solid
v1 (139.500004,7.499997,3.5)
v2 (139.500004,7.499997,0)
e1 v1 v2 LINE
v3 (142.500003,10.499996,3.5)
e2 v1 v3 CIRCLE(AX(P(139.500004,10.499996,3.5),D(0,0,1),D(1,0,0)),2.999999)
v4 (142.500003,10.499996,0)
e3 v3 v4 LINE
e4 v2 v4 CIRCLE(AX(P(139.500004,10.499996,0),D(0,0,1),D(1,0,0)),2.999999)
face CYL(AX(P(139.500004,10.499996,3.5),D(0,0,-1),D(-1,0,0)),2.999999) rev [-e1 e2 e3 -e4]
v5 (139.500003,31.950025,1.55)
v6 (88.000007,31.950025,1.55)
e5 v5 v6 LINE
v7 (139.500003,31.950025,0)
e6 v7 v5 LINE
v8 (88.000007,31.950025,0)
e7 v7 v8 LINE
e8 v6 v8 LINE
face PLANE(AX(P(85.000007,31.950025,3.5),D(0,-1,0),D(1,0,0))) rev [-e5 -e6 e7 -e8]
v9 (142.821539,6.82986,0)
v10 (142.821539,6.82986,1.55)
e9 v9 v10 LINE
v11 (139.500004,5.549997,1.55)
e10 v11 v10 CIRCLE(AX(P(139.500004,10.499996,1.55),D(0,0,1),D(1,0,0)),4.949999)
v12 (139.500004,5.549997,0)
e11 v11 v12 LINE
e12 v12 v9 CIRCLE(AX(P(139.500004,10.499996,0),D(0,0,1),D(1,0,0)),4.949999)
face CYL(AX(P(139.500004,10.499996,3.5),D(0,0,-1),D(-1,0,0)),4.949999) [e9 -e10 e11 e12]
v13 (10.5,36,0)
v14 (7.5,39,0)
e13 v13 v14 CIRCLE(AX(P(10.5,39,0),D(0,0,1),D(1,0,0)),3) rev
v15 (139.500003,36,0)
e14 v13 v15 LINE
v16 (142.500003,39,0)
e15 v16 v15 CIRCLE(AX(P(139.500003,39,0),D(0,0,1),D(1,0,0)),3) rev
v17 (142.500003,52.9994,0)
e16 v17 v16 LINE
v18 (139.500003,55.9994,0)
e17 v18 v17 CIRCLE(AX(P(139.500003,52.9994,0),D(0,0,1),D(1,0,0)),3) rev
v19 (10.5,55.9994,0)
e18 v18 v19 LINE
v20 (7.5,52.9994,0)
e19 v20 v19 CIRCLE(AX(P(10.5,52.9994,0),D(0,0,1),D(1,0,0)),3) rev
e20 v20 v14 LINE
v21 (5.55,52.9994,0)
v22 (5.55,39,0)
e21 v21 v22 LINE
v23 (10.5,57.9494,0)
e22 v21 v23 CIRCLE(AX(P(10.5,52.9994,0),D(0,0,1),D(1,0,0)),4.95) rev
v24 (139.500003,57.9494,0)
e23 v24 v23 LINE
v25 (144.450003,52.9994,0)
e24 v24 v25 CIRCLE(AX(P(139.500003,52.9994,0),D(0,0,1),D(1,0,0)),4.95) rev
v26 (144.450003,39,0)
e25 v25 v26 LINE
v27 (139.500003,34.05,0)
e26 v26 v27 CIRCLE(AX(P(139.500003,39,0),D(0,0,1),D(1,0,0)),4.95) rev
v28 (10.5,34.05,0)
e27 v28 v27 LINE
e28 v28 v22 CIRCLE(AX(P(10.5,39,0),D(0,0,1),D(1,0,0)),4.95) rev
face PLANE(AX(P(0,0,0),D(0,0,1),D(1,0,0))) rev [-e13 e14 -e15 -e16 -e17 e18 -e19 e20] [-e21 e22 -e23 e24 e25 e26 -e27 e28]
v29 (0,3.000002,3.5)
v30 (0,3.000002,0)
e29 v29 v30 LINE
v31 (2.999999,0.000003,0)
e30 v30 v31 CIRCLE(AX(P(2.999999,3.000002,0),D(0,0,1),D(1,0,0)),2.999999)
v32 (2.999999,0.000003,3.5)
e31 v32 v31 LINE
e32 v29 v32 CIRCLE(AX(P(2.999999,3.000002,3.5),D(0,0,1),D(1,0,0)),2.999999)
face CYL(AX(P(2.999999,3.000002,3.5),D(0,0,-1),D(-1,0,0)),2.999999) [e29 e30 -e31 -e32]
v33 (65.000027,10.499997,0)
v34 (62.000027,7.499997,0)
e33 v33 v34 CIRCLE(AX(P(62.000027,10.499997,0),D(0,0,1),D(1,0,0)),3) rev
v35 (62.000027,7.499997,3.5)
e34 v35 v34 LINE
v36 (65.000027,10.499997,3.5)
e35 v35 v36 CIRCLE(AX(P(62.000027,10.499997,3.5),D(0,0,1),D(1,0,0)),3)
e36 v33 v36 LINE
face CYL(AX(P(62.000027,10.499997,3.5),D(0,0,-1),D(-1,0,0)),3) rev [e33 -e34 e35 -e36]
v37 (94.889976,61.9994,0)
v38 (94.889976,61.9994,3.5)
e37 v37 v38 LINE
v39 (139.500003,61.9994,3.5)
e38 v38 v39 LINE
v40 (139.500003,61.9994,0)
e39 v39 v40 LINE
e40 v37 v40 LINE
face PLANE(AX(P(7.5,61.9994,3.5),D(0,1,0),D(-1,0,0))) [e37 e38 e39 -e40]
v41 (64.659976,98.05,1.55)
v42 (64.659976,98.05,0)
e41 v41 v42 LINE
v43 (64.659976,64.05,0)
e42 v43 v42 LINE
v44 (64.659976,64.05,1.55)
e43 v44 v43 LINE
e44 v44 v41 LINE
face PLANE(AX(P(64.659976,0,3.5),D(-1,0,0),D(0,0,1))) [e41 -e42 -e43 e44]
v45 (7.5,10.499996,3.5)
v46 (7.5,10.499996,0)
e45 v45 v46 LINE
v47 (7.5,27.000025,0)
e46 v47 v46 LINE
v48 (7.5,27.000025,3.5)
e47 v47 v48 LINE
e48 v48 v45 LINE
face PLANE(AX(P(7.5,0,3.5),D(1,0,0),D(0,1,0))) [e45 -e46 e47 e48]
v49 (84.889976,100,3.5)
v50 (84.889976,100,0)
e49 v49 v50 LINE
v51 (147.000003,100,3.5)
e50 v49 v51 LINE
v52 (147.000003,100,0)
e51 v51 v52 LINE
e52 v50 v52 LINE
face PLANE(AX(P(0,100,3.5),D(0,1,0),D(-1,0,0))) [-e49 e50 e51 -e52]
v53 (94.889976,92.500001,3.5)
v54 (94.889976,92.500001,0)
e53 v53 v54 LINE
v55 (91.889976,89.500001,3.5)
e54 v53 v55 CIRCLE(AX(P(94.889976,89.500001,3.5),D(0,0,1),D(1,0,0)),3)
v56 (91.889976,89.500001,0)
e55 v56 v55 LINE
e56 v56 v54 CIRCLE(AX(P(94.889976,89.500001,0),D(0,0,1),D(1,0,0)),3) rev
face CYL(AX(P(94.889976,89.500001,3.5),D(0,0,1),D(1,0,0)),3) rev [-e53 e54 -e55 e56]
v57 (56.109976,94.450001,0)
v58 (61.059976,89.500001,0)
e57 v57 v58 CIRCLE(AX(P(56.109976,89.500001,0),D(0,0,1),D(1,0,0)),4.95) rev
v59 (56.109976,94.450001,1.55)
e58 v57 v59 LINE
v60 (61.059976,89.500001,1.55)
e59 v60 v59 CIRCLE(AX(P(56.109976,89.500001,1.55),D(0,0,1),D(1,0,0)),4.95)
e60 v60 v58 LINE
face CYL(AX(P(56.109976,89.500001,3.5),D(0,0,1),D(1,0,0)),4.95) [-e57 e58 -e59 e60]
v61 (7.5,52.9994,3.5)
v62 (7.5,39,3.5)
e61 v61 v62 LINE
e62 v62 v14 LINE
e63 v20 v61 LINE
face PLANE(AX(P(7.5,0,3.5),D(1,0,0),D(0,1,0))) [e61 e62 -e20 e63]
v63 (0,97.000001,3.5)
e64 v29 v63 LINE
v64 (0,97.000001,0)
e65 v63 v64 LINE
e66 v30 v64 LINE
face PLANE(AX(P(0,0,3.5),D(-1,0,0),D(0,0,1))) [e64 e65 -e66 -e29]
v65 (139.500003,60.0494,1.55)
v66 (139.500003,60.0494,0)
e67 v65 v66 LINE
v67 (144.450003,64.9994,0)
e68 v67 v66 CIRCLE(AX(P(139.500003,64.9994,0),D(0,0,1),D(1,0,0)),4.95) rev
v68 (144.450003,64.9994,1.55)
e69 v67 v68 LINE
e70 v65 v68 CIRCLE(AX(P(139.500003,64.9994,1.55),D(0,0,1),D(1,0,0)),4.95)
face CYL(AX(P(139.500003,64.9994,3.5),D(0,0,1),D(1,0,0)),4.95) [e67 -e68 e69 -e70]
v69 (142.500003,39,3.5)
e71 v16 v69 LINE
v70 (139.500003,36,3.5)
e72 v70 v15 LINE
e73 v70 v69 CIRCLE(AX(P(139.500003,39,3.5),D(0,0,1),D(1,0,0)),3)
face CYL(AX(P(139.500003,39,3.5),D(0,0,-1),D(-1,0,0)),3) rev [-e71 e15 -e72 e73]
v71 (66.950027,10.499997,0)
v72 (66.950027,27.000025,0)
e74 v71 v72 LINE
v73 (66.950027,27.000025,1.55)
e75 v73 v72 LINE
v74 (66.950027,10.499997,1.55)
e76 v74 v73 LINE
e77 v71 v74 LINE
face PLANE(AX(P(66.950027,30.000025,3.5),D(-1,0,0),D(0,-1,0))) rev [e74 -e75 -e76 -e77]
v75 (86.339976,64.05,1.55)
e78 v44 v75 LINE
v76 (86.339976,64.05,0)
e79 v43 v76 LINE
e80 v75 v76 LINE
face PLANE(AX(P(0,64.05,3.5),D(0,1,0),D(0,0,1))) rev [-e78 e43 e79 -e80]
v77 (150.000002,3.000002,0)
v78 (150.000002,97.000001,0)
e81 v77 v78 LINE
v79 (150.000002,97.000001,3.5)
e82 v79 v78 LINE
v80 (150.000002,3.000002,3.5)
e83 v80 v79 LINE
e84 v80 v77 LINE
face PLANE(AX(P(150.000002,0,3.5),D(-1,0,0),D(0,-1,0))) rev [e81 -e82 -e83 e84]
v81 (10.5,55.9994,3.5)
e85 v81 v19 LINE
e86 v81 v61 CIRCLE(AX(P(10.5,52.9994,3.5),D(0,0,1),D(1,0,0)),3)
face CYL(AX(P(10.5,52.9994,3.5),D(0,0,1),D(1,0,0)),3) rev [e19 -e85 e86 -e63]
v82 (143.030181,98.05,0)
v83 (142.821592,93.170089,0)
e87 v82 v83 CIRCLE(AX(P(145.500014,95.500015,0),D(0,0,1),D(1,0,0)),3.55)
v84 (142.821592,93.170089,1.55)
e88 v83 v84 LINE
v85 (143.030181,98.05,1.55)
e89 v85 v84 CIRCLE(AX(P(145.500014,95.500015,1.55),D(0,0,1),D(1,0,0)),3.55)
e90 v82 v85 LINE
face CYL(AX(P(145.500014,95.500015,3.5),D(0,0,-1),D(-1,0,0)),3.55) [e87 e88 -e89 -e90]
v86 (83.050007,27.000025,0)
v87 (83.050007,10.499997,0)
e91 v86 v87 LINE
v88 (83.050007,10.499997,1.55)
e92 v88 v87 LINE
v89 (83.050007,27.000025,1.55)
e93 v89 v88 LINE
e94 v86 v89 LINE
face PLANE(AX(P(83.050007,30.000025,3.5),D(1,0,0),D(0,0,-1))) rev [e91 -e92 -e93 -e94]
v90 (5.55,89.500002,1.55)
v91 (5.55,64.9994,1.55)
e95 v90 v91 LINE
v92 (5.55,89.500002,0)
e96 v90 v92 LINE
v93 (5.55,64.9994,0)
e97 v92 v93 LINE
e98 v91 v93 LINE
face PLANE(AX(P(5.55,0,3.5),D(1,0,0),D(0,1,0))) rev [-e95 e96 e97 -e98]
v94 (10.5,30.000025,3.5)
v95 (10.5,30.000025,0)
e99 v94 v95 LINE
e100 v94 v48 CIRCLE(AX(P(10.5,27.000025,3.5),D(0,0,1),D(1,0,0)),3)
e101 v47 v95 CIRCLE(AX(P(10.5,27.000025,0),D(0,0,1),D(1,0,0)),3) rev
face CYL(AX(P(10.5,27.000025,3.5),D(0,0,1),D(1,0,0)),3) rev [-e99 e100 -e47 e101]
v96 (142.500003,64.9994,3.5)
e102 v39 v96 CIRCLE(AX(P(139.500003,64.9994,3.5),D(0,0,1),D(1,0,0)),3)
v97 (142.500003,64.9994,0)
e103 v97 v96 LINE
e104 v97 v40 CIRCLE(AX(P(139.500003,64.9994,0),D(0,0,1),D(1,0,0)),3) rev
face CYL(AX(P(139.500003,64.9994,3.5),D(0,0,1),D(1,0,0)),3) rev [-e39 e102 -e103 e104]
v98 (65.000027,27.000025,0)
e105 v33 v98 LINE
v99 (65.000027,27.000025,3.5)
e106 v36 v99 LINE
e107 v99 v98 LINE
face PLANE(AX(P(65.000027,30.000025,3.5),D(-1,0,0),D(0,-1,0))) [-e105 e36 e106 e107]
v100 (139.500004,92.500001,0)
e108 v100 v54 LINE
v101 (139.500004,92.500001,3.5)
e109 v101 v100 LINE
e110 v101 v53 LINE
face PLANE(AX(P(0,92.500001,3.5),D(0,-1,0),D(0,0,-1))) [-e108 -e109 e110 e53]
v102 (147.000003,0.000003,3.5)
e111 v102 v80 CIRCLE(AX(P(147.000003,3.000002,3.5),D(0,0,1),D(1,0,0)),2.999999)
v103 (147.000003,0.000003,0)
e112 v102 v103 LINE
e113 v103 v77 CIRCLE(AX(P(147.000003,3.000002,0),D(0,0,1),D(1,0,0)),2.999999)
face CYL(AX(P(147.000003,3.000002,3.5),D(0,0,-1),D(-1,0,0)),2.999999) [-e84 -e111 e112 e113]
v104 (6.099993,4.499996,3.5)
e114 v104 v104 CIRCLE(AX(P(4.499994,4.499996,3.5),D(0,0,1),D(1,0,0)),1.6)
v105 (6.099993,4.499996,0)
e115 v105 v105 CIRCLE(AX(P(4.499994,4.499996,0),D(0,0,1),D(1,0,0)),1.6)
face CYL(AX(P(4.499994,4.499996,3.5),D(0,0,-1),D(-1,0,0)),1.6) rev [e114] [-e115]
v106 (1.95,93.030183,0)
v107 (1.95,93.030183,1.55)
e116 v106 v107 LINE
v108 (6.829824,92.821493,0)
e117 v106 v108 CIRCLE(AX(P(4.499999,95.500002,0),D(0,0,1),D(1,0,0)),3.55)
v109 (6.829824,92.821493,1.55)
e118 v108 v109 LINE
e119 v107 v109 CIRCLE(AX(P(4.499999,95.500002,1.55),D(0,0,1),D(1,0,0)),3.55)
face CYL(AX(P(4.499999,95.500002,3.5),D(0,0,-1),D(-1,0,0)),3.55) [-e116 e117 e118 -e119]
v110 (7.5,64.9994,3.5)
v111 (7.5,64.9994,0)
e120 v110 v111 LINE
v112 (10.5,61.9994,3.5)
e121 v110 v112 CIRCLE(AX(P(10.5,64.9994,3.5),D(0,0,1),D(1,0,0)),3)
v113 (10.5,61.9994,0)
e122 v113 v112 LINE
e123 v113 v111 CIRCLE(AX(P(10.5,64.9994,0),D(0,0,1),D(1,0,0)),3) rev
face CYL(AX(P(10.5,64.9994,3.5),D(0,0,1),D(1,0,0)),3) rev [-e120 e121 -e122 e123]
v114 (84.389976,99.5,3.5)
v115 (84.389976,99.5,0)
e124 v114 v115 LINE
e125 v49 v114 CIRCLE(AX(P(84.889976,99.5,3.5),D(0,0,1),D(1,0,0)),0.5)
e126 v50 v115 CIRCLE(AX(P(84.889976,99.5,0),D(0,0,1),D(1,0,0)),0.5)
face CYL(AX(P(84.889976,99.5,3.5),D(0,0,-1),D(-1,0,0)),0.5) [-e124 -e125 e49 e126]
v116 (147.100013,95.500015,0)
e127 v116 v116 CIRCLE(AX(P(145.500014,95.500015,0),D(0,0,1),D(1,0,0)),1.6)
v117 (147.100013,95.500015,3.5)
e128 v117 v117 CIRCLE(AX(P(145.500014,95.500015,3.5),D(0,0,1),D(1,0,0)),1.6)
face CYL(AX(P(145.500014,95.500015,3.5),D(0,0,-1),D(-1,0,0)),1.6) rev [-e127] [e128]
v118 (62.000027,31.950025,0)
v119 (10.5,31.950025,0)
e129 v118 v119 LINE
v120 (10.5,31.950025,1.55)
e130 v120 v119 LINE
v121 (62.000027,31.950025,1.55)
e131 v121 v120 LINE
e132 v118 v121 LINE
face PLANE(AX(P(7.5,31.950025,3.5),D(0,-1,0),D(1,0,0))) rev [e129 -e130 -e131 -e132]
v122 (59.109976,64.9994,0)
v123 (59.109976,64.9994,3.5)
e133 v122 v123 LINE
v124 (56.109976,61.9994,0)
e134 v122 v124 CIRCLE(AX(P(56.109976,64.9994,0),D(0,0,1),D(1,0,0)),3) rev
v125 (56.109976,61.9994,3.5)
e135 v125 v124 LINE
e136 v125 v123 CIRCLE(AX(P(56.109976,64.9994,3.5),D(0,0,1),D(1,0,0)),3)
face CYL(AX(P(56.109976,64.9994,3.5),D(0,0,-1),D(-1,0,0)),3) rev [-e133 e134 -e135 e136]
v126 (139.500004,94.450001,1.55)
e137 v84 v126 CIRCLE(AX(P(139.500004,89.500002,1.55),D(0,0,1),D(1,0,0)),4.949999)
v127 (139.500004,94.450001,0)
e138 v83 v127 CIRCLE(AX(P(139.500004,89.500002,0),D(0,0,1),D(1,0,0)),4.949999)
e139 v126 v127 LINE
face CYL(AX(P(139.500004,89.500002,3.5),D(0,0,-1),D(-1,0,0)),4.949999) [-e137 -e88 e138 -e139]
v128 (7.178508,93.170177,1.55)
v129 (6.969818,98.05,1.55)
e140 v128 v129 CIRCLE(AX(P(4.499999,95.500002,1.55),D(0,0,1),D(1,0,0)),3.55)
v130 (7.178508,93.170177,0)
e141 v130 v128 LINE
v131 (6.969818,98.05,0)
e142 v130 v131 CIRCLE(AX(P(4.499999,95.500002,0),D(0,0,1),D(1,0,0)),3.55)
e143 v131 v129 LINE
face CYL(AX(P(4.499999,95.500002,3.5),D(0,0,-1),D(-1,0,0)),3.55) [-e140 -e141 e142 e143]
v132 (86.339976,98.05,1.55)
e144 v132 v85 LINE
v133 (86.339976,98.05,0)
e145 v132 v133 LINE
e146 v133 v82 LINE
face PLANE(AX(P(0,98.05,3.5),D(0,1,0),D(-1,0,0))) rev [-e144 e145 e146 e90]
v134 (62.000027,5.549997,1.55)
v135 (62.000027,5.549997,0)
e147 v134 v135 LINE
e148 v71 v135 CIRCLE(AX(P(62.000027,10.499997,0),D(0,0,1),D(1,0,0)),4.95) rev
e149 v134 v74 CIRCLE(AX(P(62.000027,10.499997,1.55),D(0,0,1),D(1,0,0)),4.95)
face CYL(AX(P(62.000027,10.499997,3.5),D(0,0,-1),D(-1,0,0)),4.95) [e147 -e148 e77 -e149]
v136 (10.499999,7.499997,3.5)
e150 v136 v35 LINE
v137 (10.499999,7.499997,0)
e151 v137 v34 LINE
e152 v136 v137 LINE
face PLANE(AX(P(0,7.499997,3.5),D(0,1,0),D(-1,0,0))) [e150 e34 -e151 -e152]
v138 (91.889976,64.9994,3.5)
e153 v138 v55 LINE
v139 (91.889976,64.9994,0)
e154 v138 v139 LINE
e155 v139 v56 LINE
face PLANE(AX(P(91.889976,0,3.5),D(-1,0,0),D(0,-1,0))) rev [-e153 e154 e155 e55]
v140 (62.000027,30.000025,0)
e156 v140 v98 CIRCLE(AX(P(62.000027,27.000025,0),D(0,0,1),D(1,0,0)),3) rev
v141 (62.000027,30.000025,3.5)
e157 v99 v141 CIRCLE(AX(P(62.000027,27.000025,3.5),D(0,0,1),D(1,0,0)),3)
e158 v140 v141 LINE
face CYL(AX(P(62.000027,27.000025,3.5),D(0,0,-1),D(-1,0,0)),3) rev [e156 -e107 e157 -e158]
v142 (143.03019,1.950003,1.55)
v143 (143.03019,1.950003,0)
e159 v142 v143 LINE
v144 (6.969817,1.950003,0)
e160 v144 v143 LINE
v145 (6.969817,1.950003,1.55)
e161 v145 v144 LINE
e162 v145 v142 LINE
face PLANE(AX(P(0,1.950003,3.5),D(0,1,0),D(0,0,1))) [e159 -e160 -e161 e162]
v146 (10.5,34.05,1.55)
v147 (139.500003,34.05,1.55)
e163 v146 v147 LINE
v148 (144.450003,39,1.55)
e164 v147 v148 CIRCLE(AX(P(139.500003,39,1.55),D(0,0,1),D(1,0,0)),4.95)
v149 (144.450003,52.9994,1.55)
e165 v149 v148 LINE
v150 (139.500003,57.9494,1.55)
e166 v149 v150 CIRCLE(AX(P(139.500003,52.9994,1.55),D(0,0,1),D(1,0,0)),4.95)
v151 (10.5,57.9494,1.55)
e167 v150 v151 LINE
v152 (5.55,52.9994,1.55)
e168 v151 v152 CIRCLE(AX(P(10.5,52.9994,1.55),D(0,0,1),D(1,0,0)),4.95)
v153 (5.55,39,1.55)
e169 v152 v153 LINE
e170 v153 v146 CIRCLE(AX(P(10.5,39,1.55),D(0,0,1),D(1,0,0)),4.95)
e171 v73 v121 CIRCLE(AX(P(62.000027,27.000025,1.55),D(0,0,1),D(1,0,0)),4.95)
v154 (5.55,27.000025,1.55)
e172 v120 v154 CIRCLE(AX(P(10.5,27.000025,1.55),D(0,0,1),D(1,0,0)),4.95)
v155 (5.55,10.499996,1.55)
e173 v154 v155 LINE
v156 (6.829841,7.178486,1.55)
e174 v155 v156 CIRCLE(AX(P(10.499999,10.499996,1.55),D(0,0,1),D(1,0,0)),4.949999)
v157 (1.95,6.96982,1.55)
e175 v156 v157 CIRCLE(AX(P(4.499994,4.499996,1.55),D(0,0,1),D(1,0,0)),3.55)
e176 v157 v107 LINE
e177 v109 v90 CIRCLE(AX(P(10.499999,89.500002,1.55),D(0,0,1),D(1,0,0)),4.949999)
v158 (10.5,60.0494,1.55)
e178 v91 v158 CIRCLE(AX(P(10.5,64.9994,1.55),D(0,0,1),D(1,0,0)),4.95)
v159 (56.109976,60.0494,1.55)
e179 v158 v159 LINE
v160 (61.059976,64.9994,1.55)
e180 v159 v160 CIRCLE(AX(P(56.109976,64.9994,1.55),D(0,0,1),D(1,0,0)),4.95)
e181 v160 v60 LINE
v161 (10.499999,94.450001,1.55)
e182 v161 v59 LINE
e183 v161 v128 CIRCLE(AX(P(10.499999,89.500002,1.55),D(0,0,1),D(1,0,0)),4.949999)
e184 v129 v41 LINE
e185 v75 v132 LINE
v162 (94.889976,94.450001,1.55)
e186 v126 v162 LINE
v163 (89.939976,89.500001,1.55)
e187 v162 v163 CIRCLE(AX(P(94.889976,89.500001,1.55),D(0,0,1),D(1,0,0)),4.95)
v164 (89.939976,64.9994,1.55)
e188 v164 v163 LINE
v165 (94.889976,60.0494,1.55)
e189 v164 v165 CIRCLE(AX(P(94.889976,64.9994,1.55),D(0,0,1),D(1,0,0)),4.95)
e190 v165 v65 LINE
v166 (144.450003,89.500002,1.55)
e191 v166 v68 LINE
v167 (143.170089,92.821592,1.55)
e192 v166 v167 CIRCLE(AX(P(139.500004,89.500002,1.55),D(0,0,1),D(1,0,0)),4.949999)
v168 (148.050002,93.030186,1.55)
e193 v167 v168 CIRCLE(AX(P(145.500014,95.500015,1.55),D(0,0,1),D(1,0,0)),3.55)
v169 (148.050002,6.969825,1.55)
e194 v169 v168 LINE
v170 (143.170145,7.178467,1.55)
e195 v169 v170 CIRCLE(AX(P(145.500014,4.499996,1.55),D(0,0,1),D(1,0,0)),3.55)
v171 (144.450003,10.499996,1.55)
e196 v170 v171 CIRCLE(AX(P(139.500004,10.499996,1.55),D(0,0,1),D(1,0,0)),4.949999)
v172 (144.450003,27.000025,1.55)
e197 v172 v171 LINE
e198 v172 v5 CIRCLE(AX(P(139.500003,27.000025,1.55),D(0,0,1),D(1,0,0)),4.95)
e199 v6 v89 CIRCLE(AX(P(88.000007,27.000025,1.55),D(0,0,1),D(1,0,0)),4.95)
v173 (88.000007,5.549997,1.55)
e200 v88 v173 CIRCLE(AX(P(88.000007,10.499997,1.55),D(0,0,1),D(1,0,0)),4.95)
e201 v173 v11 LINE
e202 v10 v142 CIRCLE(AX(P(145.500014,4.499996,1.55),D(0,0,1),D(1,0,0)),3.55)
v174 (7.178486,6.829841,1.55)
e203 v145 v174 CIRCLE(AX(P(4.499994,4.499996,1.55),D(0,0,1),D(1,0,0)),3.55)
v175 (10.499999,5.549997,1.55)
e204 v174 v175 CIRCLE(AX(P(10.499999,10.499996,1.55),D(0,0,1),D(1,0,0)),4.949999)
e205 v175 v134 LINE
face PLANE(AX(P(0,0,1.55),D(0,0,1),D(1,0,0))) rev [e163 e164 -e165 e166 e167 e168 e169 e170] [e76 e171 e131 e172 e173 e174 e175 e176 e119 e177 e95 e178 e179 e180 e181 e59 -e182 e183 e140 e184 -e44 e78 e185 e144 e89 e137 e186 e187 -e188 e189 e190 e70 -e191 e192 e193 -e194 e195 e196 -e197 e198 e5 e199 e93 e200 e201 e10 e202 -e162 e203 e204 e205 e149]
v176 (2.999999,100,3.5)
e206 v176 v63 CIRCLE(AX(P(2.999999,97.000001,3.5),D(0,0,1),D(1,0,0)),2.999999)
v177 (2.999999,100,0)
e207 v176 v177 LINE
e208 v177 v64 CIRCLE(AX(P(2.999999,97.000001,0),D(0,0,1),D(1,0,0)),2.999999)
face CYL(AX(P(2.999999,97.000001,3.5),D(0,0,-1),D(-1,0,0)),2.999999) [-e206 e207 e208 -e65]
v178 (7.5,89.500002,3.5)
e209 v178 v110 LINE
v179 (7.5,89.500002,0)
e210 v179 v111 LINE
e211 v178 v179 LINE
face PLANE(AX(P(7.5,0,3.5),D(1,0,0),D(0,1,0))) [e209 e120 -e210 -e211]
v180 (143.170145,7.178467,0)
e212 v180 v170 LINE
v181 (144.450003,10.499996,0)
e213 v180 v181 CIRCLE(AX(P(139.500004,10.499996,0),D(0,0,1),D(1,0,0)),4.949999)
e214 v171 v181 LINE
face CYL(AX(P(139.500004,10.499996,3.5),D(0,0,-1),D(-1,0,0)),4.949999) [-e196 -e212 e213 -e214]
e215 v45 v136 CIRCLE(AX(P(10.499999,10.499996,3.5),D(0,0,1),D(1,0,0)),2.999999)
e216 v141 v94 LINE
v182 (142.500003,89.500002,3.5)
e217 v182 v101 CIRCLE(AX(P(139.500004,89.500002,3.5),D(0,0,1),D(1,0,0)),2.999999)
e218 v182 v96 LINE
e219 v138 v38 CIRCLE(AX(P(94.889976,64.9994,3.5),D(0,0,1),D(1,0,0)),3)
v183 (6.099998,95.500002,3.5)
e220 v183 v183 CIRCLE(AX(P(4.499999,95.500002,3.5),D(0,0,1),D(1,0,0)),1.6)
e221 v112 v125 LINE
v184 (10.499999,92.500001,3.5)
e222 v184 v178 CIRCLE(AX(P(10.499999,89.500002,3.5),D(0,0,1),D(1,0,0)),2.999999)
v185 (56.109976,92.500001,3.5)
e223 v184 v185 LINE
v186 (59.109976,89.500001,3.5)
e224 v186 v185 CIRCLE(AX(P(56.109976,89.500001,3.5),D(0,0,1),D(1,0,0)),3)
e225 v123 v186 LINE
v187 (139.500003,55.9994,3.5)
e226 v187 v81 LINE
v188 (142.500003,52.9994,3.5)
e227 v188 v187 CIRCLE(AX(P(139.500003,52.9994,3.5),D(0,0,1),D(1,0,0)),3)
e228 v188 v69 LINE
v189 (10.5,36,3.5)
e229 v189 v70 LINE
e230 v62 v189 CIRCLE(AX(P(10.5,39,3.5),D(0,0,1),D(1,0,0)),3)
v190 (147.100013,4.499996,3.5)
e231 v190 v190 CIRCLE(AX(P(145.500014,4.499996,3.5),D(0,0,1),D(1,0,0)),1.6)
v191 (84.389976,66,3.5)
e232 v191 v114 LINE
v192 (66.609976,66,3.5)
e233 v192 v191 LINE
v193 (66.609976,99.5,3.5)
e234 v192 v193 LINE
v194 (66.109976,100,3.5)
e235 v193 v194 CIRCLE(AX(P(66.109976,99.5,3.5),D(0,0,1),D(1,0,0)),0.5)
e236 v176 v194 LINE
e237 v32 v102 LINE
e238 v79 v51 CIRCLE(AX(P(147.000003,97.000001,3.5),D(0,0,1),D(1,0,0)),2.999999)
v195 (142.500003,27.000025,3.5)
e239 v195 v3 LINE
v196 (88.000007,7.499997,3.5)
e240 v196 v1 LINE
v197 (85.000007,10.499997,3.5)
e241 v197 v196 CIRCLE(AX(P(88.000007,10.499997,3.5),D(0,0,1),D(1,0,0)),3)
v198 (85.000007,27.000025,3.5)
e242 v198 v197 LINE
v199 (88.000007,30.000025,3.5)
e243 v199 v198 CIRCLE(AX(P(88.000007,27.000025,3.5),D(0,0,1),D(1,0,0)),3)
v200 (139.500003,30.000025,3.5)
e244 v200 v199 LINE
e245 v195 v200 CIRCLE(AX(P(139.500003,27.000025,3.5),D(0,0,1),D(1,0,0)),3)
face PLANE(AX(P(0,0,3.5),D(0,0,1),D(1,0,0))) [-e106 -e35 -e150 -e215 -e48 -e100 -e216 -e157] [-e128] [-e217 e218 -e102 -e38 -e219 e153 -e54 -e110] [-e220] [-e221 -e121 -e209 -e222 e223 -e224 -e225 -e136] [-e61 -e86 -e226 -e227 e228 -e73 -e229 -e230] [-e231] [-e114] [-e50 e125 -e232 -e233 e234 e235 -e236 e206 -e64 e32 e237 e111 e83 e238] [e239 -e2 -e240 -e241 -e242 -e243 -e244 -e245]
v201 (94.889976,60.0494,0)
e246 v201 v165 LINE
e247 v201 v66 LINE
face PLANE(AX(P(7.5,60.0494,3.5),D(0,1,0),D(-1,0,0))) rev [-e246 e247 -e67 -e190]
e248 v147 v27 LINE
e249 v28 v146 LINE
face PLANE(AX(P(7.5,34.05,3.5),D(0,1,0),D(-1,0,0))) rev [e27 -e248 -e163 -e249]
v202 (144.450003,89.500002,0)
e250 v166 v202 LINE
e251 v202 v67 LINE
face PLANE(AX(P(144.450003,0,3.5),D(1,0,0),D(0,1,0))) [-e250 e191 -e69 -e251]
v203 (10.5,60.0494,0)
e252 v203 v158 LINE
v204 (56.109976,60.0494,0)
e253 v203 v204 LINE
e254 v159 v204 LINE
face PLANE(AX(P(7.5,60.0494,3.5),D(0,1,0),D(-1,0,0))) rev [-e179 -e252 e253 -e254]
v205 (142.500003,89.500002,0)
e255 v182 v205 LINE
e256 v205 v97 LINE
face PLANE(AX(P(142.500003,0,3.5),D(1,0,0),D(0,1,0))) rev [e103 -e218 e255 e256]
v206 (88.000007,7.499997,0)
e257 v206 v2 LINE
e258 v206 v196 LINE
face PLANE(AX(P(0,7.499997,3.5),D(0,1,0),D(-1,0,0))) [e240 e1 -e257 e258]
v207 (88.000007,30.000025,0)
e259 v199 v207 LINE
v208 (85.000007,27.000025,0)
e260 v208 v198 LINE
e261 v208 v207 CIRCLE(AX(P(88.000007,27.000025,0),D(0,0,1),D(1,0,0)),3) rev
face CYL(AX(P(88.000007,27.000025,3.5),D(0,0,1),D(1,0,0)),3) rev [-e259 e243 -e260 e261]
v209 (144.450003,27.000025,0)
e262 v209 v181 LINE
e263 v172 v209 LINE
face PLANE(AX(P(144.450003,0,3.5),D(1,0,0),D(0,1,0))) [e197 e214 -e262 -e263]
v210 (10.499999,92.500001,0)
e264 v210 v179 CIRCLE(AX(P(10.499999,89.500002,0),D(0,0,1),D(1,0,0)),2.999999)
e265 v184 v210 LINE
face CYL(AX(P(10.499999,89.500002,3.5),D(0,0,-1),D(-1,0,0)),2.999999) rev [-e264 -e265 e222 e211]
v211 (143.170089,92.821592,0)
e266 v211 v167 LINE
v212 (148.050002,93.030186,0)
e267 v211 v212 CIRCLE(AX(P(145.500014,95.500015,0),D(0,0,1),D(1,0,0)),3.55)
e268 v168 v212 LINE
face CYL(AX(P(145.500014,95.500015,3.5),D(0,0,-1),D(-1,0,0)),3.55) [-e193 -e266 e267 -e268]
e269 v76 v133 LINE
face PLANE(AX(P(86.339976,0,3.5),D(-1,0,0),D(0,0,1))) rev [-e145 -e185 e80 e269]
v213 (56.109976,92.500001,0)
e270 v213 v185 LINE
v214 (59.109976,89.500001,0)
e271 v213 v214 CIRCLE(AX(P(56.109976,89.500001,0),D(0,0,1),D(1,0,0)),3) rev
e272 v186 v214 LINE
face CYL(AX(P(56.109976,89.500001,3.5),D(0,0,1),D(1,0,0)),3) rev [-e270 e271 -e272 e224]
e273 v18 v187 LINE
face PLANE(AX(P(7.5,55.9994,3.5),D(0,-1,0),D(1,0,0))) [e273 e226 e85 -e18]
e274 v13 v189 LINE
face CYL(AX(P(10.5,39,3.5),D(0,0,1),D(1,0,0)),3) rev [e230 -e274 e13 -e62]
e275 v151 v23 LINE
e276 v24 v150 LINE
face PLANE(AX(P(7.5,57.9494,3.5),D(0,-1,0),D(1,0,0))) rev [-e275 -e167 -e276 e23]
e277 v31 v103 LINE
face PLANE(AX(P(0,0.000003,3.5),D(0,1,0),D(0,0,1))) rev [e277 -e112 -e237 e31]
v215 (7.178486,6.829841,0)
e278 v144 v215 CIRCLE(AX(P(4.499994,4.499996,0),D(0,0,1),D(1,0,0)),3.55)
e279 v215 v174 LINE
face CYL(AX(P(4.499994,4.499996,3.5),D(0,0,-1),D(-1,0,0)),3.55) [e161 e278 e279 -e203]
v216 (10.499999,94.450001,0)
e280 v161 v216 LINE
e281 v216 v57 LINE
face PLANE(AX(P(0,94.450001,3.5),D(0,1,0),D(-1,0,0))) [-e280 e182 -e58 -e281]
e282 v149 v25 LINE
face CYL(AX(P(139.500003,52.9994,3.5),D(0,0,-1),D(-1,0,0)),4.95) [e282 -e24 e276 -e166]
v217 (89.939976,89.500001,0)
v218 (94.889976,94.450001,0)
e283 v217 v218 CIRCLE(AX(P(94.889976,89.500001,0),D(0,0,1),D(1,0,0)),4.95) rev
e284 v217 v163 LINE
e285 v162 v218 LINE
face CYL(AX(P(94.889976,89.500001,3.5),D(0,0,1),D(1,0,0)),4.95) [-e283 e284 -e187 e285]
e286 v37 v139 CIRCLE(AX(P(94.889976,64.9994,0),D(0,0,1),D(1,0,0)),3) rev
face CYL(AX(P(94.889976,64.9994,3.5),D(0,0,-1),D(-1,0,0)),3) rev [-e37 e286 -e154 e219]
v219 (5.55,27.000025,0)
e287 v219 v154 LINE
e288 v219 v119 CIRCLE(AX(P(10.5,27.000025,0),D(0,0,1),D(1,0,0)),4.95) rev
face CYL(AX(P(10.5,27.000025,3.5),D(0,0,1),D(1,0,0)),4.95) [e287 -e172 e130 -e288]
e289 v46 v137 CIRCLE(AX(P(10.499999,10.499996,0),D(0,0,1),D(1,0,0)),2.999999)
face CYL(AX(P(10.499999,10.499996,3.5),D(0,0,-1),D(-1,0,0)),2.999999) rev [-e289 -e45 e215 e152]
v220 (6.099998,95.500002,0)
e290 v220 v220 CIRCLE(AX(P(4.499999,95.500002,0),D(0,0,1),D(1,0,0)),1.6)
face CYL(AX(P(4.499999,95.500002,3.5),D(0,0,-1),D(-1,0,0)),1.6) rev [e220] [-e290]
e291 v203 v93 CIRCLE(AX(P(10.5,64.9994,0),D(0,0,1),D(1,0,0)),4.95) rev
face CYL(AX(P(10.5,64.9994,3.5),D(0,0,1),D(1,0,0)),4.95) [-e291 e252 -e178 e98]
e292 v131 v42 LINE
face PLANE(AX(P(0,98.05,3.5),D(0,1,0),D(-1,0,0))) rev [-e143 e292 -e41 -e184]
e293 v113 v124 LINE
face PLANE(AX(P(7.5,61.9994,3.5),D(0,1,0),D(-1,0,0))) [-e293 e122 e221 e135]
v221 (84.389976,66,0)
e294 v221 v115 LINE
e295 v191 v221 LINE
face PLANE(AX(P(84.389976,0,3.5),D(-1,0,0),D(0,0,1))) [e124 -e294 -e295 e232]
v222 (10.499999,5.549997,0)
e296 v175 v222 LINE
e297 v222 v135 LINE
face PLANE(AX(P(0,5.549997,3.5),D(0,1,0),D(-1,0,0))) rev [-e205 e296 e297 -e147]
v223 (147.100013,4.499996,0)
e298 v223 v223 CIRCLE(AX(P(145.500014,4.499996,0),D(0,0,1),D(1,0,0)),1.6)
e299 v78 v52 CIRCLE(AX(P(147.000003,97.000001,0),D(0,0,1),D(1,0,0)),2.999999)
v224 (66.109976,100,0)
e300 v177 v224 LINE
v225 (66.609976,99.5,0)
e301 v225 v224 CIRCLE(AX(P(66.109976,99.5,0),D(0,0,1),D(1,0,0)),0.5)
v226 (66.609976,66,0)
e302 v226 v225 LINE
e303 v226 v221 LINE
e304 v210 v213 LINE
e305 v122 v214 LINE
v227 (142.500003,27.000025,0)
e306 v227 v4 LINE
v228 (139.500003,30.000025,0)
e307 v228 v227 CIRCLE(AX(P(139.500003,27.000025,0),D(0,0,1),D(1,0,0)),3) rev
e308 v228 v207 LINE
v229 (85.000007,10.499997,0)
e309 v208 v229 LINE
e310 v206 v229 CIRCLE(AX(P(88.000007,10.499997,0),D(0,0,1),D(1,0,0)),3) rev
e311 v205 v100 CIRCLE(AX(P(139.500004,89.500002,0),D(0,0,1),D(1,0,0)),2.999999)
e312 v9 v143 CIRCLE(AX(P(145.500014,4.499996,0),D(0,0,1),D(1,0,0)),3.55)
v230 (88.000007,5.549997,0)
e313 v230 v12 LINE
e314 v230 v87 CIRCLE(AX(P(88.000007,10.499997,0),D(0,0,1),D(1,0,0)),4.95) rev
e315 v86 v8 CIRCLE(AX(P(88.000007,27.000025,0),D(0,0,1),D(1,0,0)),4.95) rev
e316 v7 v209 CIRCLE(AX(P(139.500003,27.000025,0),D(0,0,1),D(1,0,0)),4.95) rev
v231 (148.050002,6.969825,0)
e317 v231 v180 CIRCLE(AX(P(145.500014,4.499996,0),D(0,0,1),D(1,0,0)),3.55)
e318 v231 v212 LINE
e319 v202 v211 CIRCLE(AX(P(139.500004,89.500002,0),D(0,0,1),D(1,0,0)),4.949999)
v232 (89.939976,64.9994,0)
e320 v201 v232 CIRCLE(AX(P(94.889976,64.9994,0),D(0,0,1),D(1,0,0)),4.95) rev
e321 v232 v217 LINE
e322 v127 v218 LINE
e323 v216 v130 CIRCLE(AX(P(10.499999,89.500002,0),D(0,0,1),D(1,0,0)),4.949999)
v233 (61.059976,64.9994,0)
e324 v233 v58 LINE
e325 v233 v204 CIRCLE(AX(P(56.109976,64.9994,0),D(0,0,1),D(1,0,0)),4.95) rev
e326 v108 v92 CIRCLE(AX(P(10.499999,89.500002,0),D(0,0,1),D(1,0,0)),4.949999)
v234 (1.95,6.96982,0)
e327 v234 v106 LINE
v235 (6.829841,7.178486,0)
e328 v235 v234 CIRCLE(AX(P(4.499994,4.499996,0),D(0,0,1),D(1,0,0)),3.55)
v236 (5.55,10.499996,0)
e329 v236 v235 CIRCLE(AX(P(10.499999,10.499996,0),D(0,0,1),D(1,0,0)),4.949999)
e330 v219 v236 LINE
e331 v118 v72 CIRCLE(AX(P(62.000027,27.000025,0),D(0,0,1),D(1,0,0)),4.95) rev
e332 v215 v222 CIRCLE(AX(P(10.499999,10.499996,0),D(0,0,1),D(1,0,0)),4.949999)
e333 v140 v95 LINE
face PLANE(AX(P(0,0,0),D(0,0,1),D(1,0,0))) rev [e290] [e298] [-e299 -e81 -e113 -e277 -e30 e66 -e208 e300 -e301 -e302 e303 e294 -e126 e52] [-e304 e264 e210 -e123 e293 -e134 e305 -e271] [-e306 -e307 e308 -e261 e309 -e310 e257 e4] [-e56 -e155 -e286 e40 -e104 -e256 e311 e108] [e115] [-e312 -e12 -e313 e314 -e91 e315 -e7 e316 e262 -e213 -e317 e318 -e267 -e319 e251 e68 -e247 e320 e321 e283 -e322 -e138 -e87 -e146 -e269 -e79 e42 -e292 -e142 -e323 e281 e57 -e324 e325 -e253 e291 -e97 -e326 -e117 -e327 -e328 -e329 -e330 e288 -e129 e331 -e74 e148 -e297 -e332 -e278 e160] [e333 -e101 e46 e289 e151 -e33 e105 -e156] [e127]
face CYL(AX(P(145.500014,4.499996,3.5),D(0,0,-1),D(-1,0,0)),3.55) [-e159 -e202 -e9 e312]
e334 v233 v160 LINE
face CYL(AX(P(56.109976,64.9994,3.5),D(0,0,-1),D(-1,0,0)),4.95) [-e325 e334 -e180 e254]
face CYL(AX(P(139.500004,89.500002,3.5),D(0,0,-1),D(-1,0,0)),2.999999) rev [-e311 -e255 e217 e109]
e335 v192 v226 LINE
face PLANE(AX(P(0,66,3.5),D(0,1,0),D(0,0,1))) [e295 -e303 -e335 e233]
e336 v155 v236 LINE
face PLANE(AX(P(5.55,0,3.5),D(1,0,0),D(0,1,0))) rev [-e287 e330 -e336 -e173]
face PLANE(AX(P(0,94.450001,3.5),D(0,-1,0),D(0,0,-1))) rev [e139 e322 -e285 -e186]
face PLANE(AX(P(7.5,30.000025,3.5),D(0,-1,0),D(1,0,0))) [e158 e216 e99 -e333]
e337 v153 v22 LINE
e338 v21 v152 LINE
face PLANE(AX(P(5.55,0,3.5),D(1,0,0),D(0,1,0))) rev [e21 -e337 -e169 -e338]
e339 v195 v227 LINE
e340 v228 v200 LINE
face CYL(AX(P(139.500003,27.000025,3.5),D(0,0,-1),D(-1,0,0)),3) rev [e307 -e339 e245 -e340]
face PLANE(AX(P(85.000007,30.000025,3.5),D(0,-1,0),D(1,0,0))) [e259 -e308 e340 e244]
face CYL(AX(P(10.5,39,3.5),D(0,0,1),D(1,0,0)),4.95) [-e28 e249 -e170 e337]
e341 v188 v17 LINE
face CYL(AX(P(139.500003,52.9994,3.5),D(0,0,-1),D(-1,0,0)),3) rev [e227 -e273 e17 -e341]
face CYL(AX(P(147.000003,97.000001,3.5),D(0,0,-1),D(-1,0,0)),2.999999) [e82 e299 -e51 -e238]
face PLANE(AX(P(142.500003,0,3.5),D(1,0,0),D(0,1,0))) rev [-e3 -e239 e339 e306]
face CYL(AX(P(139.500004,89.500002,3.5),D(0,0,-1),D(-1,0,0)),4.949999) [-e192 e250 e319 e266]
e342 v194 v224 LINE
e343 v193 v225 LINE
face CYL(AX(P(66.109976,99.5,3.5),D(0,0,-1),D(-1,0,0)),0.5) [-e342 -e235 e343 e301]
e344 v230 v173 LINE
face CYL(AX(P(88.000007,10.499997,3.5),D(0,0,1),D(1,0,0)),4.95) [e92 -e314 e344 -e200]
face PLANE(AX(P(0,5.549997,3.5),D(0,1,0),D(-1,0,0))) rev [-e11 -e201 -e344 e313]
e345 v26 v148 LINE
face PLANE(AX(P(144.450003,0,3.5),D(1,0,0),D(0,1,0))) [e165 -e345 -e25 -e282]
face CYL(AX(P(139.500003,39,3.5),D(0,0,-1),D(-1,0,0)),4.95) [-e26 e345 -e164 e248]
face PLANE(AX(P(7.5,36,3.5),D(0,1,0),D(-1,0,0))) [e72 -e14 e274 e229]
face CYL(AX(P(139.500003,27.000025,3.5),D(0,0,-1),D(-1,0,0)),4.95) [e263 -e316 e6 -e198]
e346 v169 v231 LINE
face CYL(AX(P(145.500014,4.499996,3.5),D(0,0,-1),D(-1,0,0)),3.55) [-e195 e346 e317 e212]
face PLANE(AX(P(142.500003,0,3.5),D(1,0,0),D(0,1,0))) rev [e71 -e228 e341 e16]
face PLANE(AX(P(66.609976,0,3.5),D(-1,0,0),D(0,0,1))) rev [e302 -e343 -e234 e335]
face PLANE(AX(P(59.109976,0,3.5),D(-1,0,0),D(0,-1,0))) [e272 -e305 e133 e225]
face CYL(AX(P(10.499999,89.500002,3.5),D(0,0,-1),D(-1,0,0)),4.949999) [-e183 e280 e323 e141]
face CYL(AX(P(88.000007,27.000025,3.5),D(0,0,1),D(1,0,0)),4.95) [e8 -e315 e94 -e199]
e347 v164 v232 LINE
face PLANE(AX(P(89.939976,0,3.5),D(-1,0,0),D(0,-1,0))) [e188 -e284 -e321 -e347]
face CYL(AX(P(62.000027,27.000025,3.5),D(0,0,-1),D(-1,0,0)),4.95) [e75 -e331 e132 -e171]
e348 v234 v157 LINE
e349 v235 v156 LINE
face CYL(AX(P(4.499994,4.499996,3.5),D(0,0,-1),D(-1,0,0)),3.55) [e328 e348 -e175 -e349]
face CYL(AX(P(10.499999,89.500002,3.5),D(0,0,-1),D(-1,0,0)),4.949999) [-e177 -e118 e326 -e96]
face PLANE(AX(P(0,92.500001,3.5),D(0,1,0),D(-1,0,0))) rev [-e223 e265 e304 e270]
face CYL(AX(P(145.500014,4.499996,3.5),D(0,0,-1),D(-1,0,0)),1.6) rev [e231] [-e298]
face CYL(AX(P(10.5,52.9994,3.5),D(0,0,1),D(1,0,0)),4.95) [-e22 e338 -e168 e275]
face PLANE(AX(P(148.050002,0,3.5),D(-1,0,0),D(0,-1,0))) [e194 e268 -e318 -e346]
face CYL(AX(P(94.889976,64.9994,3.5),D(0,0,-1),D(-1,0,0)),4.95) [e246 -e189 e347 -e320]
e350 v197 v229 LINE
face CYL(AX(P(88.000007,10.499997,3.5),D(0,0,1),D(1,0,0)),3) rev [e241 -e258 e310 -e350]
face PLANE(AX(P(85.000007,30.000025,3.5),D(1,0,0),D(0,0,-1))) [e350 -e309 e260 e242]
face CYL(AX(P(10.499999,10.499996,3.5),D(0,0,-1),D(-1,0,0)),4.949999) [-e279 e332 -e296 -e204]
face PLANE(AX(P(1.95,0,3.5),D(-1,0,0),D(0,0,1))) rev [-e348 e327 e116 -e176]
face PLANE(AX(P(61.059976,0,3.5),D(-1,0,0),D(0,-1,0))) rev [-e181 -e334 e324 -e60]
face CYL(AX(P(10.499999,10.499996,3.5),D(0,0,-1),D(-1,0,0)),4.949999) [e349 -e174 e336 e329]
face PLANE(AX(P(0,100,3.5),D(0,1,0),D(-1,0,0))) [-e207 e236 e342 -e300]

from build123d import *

# Parameters (mm, degrees)
MODEL_R         = 1.59999954
EXTRUDE_1_DEPTH = 3.5
SKETCH_2_W      = 135.00000272
SKETCH_2_H      = 6
EXTRUDE_2_DEPTH = 3.5
FILLET_2_R      = 3
FILLET_3_R      = 3
FILLET_4_R      = 3
FILLET_5_R      = 3
FILLET_6_R      = 3
FILLET_7_R      = 3
FILLET_8_R      = 3
FILLET_9_R      = 3
FILLET_10_R     = 3
FILLET_11_R     = 3
FILLET_12_DEPTH = 3.5
FILLET_13_R     = 3
FILLET_14_R     = 3
FILLET_15_DEPTH = 3.5
FILLET_16_R     = 3
FILLET_17_R     = 3
SHELL_5_DEPTH   = 1.55


with BuildPart() as part:
    # Model → 凸台-拉伸1 (new body)
    with BuildSketch(Plane.XY):
        with BuildLine():
            Line((84.889976, 100), (147.00000318, 100))
            ThreePointArc((147.00000318, 100), (149.121322873, 99.121320613), (150.00000226, 97.00000092))
            Line((150.00000226, 97.00000092), (150.00000226, 3.00000162))
            ThreePointArc((150.00000226, 3.00000162), (149.121322873, 0.878681927), (147.00000318, 2.54e-06))
            Line((147.00000318, 2.54e-06), (2.99999908, 2.54e-06))
            ThreePointArc((2.99999908, 2.54e-06), (0.878679387, 0.878681927), (0, 3.00000162))
            Line((0, 3.00000162), (0, 97.00000092))
            ThreePointArc((0, 97.00000092), (0.878679387, 99.121320613), (2.99999908, 100))
            Line((2.99999908, 100), (66.109976, 100))
            ThreePointArc((66.109976, 100), (66.463529391, 99.853553391), (66.609976, 99.5))
            Line((66.609976, 99.5), (66.609976, 66))
            Line((66.609976, 66), (84.389976, 66))
            Line((84.389976, 66), (84.389976, 99.5))
            ThreePointArc((84.389976, 99.5), (84.536422609, 99.853553391), (84.889976, 100))
        make_face()
        with Locations((4.49999862, 95.50000204)):
            Circle(MODEL_R, mode=Mode.SUBTRACT)
        with Locations((145.5000138, 95.50001474)):
            Circle(MODEL_R, mode=Mode.SUBTRACT)
        with Locations((145.5000138, 4.49999608)):
            Circle(MODEL_R, mode=Mode.SUBTRACT)
        with Locations((4.49999354, 4.49999608)):
            Circle(MODEL_R, mode=Mode.SUBTRACT)
        with BuildLine():
            Line((59.609976, 58.5), (91.389976, 58.5))
            ThreePointArc((91.389976, 58.5), (91.743529391, 58.646446609), (91.889976, 59))
            Line((91.889976, 59), (91.889976, 92.00000066))
            ThreePointArc((91.889976, 92.00000066), (92.036422609, 92.353554051), (92.389976, 92.50000066))
            Line((92.389976, 92.50000066), (139.50000364, 92.50000066))
            ThreePointArc((139.50000364, 92.50000066), (141.621323333, 91.621321273), (142.50000272, 89.50000158))
            Line((142.50000272, 89.50000158), (142.50000272, 10.49999608))
            ThreePointArc((142.50000272, 10.49999608), (141.621323333, 8.378676387), (139.50000364, 7.499997))
            Line((139.50000364, 7.499997), (10.49999908, 7.499997))
            ThreePointArc((10.49999908, 7.499997), (8.378679387, 8.378676387), (7.5, 10.49999608))
            Line((7.5, 10.49999608), (7.5, 89.50000158))
            ThreePointArc((7.5, 89.50000158), (8.378679387, 91.621321273), (10.49999908, 92.50000066))
            Line((10.49999908, 92.50000066), (58.609976, 92.50000066))
            ThreePointArc((58.609976, 92.50000066), (58.963529391, 92.353554051), (59.109976, 92.00000066))
            Line((59.109976, 92.00000066), (59.109976, 59))
            ThreePointArc((59.109976, 59), (59.256422609, 58.646446609), (59.609976, 58.5))
        make_face(mode=Mode.SUBTRACT)
    extrude(amount=EXTRUDE_1_DEPTH)

    # 草图2 → 凸台-拉伸2 (add)
    with BuildSketch(Plane(origin=(0, 0, 0), x_dir=(-1, 0, 0), z_dir=(0, 0, -1))):
        with Locations((-75.00000136, 58.9994)):
            Rectangle(SKETCH_2_W, SKETCH_2_H)
        Polygon((-7.5, 30.00002482), (-65.0000272, 30.00002482), (-65.0000272, 7.499997), (-71.0000272, 7.499997), (-79.0000068, 7.499997), (-85.0000068, 7.499997), (-85.0000068, 30.00002482), (-142.50000272, 30.00002482), (-142.50000272, 36), (-7.5, 36), align=None)
    extrude(amount=-EXTRUDE_2_DEPTH)

    # 圆角2
    fillet_2_edges = [part.edges().sort_by_distance(p)[0] for p in [
        (142.50000272, 30.00002482, 1.75),
    ]]
    fillet(fillet_2_edges, radius=FILLET_2_R)

    # 圆角3
    fillet_3_edges = [part.edges().sort_by_distance(p)[0] for p in [
        (85.0000068, 30.00002482, 1.75),
    ]]
    fillet(fillet_3_edges, radius=FILLET_3_R)

    # 圆角4
    fillet_4_edges = [part.edges().sort_by_distance(p)[0] for p in [
        (85.0000068, 7.499997, 1.75),
    ]]
    fillet(fillet_4_edges, radius=FILLET_4_R)

    # 圆角5
    fillet_5_edges = [part.edges().sort_by_distance(p)[0] for p in [
        (65.0000272, 30.00002482, 1.75),
    ]]
    fillet(fillet_5_edges, radius=FILLET_5_R)

    # 圆角6
    fillet_6_edges = [part.edges().sort_by_distance(p)[0] for p in [
        (7.5, 30.00002482, 1.75),
    ]]
    fillet(fillet_6_edges, radius=FILLET_6_R)

    # 圆角7
    fillet_7_edges = [part.edges().sort_by_distance(p)[0] for p in [
        (65.0000272, 7.499997, 1.75),
    ]]
    fillet(fillet_7_edges, radius=FILLET_7_R)

    # 圆角8
    fillet_8_edges = [part.edges().sort_by_distance(p)[0] for p in [
        (7.5, 55.9994, 1.75),
    ]]
    fillet(fillet_8_edges, radius=FILLET_8_R)

    # 圆角9
    fillet_9_edges = [part.edges().sort_by_distance(p)[0] for p in [
        (7.5, 36, 1.75),
    ]]
    fillet(fillet_9_edges, radius=FILLET_9_R)

    # 圆角10
    fillet_10_edges = [part.edges().sort_by_distance(p)[0] for p in [
        (142.50000272, 55.9994, 1.75),
    ]]
    fillet(fillet_10_edges, radius=FILLET_10_R)

    # 圆角11
    fillet_11_edges = [part.edges().sort_by_distance(p)[0] for p in [
        (142.50000272, 36, 1.75),
    ]]
    fillet(fillet_11_edges, radius=FILLET_11_R)

    # 圆角12: read off the stored shape, not the designer's step
    # 圆角12 outline → 圆角12 (add)
    with BuildSketch(Plane.XY):
        with BuildLine():
            ThreePointArc((56.109976, 92.50000066), (58.231296344, 91.621321004), (59.109976, 89.50000066))
            Line((59.109976, 89.50000066), (59.109976, 92.00000066))
            ThreePointArc((59.109976, 92.00000066), (58.963529391, 92.353554051), (58.609976, 92.50000066))
            Line((58.609976, 92.50000066), (56.109976, 92.50000066))
        make_face()
    extrude(amount=FILLET_12_DEPTH)

    # 圆角13
    fillet_13_edges = [part.edges().sort_by_distance(p)[0] for p in [
        (7.5, 61.9994, 1.75),
    ]]
    fillet(fillet_13_edges, radius=FILLET_13_R)

    # 圆角14
    fillet_14_edges = [part.edges().sort_by_distance(p)[0] for p in [
        (59.109976, 61.9994, 1.75),
    ]]
    fillet(fillet_14_edges, radius=FILLET_14_R)

    # 圆角15: read off the stored shape, not the designer's step
    # 圆角15 outline → 圆角15 (add)
    with BuildSketch(Plane.XY):
        with BuildLine():
            ThreePointArc((91.889976, 89.50000066), (92.768655656, 91.621321004), (94.889976, 92.50000066))
            Line((94.889976, 92.50000066), (92.389976, 92.50000066))
            ThreePointArc((92.389976, 92.50000066), (92.036422609, 92.353554051), (91.889976, 92.00000066))
            Line((91.889976, 92.00000066), (91.889976, 89.50000066))
        make_face()
    extrude(amount=FILLET_15_DEPTH)

    # 圆角16
    fillet_16_edges = [part.edges().sort_by_distance(p)[0] for p in [
        (91.889976, 61.9994, 1.75),
    ]]
    fillet(fillet_16_edges, radius=FILLET_16_R)

    # 圆角17
    fillet_17_edges = [part.edges().sort_by_distance(p)[0] for p in [
        (142.50000272, 61.9994, 1.75),
    ]]
    fillet(fillet_17_edges, radius=FILLET_17_R)

    # 抽壳5: read off the stored shape, not the designer's step
    # 抽壳5 outline → 抽壳5 (cut)
    with BuildSketch(Plane.XY):
        with BuildLine():
            Line((148.05000226, 6.96982514), (148.05000226, 93.03018568))
            ThreePointArc((148.05000226, 93.03018568), (145.651621189, 91.953253974), (143.170088948, 92.821592272))
            ThreePointArc((143.170088948, 92.821592272), (144.118954267, 91.279829099), (144.45000272, 89.50000158))
            Line((144.45000272, 89.50000158), (144.45000272, 64.9994))
            ThreePointArc((144.45000272, 64.9994), (143.000181287, 61.499221433), (139.50000272, 60.0494))
            Line((139.50000272, 60.0494), (94.889976, 60.0494))
            ThreePointArc((94.889976, 60.0494), (91.389797433, 61.499221433), (89.939976, 64.9994))
            Line((89.939976, 64.9994), (89.939976, 89.50000066))
            ThreePointArc((89.939976, 89.50000066), (91.389797433, 93.000179227), (94.889976, 94.45000066))
            Line((94.889976, 94.45000066), (139.50000364, 94.45000066))
            ThreePointArc((139.50000364, 94.45000066), (141.279830004, 94.118952652), (142.821592497, 93.170088549))
            ThreePointArc((142.821592497, 93.170088549), (141.953252898, 95.651618945), (143.030181436, 98.05))
            Line((143.030181436, 98.05), (86.339976, 98.05))
            Line((86.339976, 98.05), (86.339976, 64.05))
            Line((86.339976, 64.05), (64.659976, 64.05))
            Line((64.659976, 64.05), (64.659976, 98.05))
            Line((64.659976, 98.05), (6.969817872, 98.05))
            ThreePointArc((6.969817872, 98.05), (8.046756275, 95.651682201), (7.178507736, 93.170176799))
            ThreePointArc((7.178507736, 93.170176799), (8.720234077, 94.118976296), (10.49999908, 94.45000066))
            Line((10.49999908, 94.45000066), (56.109976, 94.45000066))
            ThreePointArc((56.109976, 94.45000066), (59.610154567, 93.000179227), (61.059976, 89.50000066))
            Line((61.059976, 89.50000066), (61.059976, 64.9994))
            ThreePointArc((61.059976, 64.9994), (59.610154567, 61.499221433), (56.109976, 60.0494))
            Line((56.109976, 60.0494), (10.5, 60.0494))
            ThreePointArc((10.5, 60.0494), (6.999821433, 61.499221433), (5.55, 64.9994))
            Line((5.55, 64.9994), (5.55, 89.50000158))
            ThreePointArc((5.55, 89.50000158), (5.881024364, 91.279766583), (6.829823861, 92.821492924))
            ThreePointArc((6.829823861, 92.821492924), (4.348317985, 91.953244405), (1.95, 93.030183469))
            Line((1.95, 93.030183469), (1.95, 6.969819896))
            ThreePointArc((1.95, 6.969819896), (4.348331062, 8.046754491), (6.829840696, 7.178486133))
            ThreePointArc((6.829840696, 7.178486133), (5.881028875, 8.720219371), (5.55, 10.49999608))
            Line((5.55, 10.49999608), (5.55, 27.00002482))
            ThreePointArc((5.55, 27.00002482), (6.999821433, 30.500203387), (10.5, 31.95002482))
            Line((10.5, 31.95002482), (62.0000272, 31.95002482))
            ThreePointArc((62.0000272, 31.95002482), (65.500205767, 30.500203387), (66.9500272, 27.00002482))
            Line((66.9500272, 27.00002482), (66.9500272, 10.499997))
            ThreePointArc((66.9500272, 10.499997), (65.500205767, 6.999818433), (62.0000272, 5.549997))
            Line((62.0000272, 5.549997), (10.49999908, 5.549997))
            ThreePointArc((10.49999908, 5.549997), (8.720220238, 5.881026696), (7.178485744, 6.829840763))
            ThreePointArc((7.178485744, 6.829840763), (8.046751881, 4.348331965), (6.969817356, 1.95000254))
            Line((6.969817356, 1.95000254), (143.030189984, 1.95000254))
            ThreePointArc((143.030189984, 1.95000254), (141.953254903, 4.348344975), (142.821538688, 6.829860413))
            ThreePointArc((142.821538688, 6.829860413), (141.279796144, 5.881031961), (139.50000364, 5.549997))
            Line((139.50000364, 5.549997), (88.0000068, 5.549997))
            ThreePointArc((88.0000068, 5.549997), (84.499828233, 6.999818433), (83.0500068, 10.499997))
            Line((83.0500068, 10.499997), (83.0500068, 27.00002482))
            ThreePointArc((83.0500068, 27.00002482), (84.499828233, 30.500203387), (88.0000068, 31.95002482))
            Line((88.0000068, 31.95002482), (139.50000272, 31.95002482))
            ThreePointArc((139.50000272, 31.95002482), (143.000181287, 30.500203387), (144.45000272, 27.00002482))
            Line((144.45000272, 27.00002482), (144.45000272, 10.49999608))
            ThreePointArc((144.45000272, 10.49999608), (144.118969266, 8.720207487), (143.170144932, 7.178467247))
            ThreePointArc((143.170144932, 7.178467247), (145.651658255, 8.046755262), (148.05000226, 6.96982514))
        make_face()
        with BuildLine():
            Line((144.45000272, 52.9994), (144.45000272, 39))
            ThreePointArc((144.45000272, 39), (143.000181287, 35.499821433), (139.50000272, 34.05))
            Line((139.50000272, 34.05), (10.5, 34.05))
            ThreePointArc((10.5, 34.05), (6.999821433, 35.499821433), (5.55, 39))
            Line((5.55, 39), (5.55, 52.9994))
            ThreePointArc((5.55, 52.9994), (6.999821433, 56.499578567), (10.5, 57.9494))
            Line((10.5, 57.9494), (139.50000272, 57.9494))
            ThreePointArc((139.50000272, 57.9494), (143.000181287, 56.499578567), (144.45000272, 52.9994))
        make_face(mode=Mode.SUBTRACT)
    extrude(amount=SHELL_5_DEPTH, mode=Mode.SUBTRACT)


solid = part.part
